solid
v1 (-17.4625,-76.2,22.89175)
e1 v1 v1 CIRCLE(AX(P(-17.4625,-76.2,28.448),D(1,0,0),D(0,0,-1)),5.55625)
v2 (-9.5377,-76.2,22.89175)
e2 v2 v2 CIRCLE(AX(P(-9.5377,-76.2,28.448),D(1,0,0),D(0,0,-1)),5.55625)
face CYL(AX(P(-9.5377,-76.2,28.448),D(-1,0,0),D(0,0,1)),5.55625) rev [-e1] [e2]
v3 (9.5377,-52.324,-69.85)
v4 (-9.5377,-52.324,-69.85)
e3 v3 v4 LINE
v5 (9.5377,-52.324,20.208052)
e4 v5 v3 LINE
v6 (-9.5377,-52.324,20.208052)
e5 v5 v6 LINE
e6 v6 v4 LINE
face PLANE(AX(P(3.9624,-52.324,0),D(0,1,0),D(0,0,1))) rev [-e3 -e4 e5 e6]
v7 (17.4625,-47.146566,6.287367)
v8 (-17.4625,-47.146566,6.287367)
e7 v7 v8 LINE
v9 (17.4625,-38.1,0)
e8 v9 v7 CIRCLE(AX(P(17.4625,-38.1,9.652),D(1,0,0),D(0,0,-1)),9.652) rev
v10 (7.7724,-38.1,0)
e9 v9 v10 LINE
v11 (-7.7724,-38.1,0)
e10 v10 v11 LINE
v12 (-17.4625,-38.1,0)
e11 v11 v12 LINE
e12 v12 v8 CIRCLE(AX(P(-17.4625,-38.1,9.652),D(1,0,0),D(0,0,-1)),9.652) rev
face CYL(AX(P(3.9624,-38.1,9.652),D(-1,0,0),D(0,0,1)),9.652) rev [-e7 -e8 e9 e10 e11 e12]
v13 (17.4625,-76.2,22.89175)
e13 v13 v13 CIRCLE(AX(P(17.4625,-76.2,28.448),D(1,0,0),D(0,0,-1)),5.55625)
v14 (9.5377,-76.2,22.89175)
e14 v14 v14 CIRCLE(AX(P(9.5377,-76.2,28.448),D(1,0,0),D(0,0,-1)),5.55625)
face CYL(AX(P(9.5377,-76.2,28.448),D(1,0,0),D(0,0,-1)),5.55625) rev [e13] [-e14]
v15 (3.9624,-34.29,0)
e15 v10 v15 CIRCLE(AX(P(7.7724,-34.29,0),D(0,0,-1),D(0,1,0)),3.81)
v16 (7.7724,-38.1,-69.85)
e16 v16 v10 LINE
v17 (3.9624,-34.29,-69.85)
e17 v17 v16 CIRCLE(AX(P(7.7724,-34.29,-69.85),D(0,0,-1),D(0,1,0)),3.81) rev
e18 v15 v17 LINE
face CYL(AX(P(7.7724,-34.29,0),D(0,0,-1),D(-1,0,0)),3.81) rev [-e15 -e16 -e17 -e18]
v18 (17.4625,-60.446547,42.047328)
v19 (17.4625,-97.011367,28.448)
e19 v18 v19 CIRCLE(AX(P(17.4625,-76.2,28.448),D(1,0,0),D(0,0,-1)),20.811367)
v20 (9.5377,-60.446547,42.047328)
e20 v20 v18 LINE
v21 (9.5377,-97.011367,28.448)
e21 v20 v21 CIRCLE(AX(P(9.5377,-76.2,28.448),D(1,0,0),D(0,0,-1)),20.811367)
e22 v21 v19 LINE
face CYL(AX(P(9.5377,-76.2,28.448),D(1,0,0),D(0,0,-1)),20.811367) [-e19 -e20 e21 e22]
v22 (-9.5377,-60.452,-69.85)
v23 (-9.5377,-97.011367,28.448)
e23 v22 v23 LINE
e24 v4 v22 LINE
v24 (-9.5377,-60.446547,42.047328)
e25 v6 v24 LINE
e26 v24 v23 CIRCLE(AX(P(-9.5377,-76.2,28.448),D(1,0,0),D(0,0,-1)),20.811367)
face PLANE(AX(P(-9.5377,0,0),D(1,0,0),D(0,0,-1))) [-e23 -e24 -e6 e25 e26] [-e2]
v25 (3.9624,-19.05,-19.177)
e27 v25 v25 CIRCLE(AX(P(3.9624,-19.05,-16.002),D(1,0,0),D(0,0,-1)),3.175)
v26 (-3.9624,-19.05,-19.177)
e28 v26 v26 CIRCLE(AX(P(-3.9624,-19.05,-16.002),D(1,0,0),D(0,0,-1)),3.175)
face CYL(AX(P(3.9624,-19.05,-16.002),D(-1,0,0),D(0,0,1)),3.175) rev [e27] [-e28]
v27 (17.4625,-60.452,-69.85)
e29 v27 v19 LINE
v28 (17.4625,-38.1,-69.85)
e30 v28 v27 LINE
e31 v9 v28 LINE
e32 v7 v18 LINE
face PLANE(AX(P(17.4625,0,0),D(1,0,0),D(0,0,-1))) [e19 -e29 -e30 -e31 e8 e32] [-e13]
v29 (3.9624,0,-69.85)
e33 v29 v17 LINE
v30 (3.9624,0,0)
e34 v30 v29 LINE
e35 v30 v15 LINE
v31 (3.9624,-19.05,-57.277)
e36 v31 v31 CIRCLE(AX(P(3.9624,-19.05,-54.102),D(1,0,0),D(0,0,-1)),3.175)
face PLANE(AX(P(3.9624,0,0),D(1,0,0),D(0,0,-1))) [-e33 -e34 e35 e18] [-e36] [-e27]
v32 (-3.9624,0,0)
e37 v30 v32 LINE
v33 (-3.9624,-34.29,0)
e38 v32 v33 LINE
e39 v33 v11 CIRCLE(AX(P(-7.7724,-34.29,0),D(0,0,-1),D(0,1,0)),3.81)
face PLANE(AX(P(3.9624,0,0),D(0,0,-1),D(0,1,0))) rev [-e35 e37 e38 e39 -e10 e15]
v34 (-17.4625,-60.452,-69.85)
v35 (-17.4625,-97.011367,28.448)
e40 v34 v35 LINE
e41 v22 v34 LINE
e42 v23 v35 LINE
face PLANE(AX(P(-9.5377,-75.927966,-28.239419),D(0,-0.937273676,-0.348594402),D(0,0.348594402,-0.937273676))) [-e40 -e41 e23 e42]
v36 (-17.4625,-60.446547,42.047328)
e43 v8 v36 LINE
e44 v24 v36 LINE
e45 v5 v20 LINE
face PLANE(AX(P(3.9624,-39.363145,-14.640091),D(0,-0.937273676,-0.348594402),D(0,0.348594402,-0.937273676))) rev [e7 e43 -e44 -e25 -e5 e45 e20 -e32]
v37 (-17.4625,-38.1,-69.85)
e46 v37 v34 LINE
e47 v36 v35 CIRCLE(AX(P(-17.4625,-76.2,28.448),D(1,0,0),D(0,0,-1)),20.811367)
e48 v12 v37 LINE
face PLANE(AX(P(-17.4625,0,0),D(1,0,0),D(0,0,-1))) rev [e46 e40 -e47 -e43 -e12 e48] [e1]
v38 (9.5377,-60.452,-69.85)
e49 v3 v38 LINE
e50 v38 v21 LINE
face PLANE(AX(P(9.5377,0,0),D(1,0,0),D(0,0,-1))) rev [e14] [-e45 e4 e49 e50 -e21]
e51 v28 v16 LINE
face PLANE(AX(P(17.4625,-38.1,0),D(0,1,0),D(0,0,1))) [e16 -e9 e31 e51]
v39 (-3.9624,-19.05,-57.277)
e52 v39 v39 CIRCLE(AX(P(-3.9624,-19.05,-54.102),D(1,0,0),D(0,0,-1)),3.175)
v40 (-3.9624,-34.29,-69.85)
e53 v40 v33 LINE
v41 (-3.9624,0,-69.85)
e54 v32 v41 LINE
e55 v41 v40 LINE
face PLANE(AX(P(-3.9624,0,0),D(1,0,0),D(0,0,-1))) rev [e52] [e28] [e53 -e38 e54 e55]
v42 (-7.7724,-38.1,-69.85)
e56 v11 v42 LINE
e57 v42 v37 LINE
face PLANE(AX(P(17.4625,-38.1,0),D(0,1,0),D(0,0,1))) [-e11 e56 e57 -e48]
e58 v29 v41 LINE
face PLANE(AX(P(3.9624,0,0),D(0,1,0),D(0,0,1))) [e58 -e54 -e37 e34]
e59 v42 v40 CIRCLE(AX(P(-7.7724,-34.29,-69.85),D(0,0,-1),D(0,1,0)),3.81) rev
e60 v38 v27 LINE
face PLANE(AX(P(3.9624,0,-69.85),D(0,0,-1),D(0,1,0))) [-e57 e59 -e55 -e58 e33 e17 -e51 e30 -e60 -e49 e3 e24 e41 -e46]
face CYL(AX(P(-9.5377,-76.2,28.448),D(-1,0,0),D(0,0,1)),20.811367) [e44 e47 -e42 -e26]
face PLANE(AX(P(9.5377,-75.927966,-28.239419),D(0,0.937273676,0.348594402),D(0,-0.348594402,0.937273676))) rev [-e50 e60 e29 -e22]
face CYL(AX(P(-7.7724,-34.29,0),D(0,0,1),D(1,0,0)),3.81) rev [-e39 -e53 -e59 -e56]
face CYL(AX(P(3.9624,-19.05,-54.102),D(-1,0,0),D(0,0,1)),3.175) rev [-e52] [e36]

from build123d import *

# Parameters (mm, degrees)
SKETCH1_W           = 69.85
SKETCH1_H           = 38.1
SKETCH1_R           = 3.175
BOSS_EXTRUDE1_DEPTH = 3.9624
BOSS_EXTRUDE2_DEPTH = 17.4625
BOSS_EXTRUDE4_START = 9.5377
SKETCH1_5_R         = 5.55625
BOSS_EXTRUDE4_DEPTH = 7.9248
BOSS_EXTRUDE5_START = -17.4625
SKETCH1_6_R         = 5.55625
BOSS_EXTRUDE5_DEPTH = 7.9248
FILLET1_R           = 3.81


with BuildPart() as part:
    # Sketch1 → Boss-Extrude1 (new, symmetric)
    # profile 1 of 2: a face of its own
    with BuildSketch(Plane(origin=(0, 0, 0), x_dir=(0, 0, -1), z_dir=(1, 0, 0))):
        with Locations((34.925, -19.05)):
            Rectangle(SKETCH1_W, SKETCH1_H)
        with Locations((16.002, -19.05)):
            Circle(SKETCH1_R, mode=Mode.SUBTRACT)
        with Locations((54.102, -19.05)):
            Circle(SKETCH1_R, mode=Mode.SUBTRACT)
    # profile 2 of 2: a face of its own
    with BuildSketch(Plane(origin=(0, 0, 0), x_dir=(0, 0, -1), z_dir=(1, 0, 0))):
        with BuildLine():
            Line((69.85, -38.1), (0, -38.1))
            ThreePointArc((0, -38.1), (-1.726202144, -43.608432839), (-6.287366834, -47.146565517))
            Line((-6.287366834, -47.146565517), (-20.208052372, -52.324))
            Line((-20.208052372, -52.324), (69.85, -52.324))
            Line((69.85, -52.324), (69.85, -38.1))
        make_face()
    extrude(amount=BOSS_EXTRUDE1_DEPTH, both=True)

    # Sketch1<3> → Boss-Extrude2 (add, symmetric)
    with BuildSketch(Plane(origin=(0, 0, 0), x_dir=(0, 0, -1), z_dir=(1, 0, 0))):
        with BuildLine():
            Line((69.85, -38.1), (0, -38.1))
            ThreePointArc((0, -38.1), (-1.726202144, -43.608432839), (-6.287366834, -47.146565517))
            Line((-6.287366834, -47.146565517), (-20.208052372, -52.324))
            Line((-20.208052372, -52.324), (69.85, -52.324))
            Line((69.85, -52.324), (69.85, -38.1))
        make_face()
    extrude(amount=BOSS_EXTRUDE2_DEPTH, both=True)

    # Sketch1<5> → Boss-Extrude4 (add)
    with BuildSketch(Plane(origin=(0, 0, 0), x_dir=(0, 0, -1), z_dir=(1, 0, 0)).offset(BOSS_EXTRUDE4_START)):
        with BuildLine():
            Line((69.85, -60.452), (69.85, -52.324))
            Line((69.85, -52.324), (-20.208052372, -52.324))
            Line((-20.208052372, -52.324), (-28.448, -55.388632763))
            Line((-28.448, -55.388632763), (-42.047327619, -60.446546582))
            ThreePointArc((-42.047327619, -60.446546582), (-47.953946665, -83.454726113), (-28.448, -97.011367237))
            Line((-28.448, -97.011367237), (69.85, -60.452))
        make_face()
        with Locations((-28.448, -76.2)):
            Circle(SKETCH1_5_R, mode=Mode.SUBTRACT)
    extrude(amount=BOSS_EXTRUDE4_DEPTH)

    # Sketch1<6> → Boss-Extrude5 (add)
    with BuildSketch(Plane(origin=(0, 0, 0), x_dir=(0, 0, -1), z_dir=(1, 0, 0)).offset(BOSS_EXTRUDE5_START)):
        with BuildLine():
            Line((69.85, -60.452), (69.85, -52.324))
            Line((69.85, -52.324), (-20.208052372, -52.324))
            Line((-20.208052372, -52.324), (-28.448, -55.388632763))
            Line((-28.448, -55.388632763), (-42.047327619, -60.446546582))
            ThreePointArc((-42.047327619, -60.446546582), (-47.953946665, -83.454726113), (-28.448, -97.011367237))
            Line((-28.448, -97.011367237), (69.85, -60.452))
        make_face()
        with Locations((-28.448, -76.2)):
            Circle(SKETCH1_6_R, mode=Mode.SUBTRACT)
    extrude(amount=BOSS_EXTRUDE5_DEPTH)

    # Fillet1
    # the kernel refuses this fillet: 3.81 mm, written as the material it adds along each edge
    with BuildSketch(Plane(origin=(-3.9624, -38.1, -69.85), x_dir=(-1, 0, 0), z_dir=(0, 0, 1))) as fillet1_piece_1:
        with BuildLine():
            CenterArc((FILLET1_R, -FILLET1_R), FILLET1_R, 90, 90)
            Line((0, -FILLET1_R), (0, 0))
            Line((0, 0), (FILLET1_R, 0))
        make_face()
    extrude(amount=69.85)
    with BuildSketch(Plane(origin=(3.9624, -38.1, -69.85), x_dir=(1, 0, 0), z_dir=(0, 0, 1))) as fillet1_piece_2:
        with BuildLine():
            CenterArc((FILLET1_R, FILLET1_R), FILLET1_R, 180, 90)
            Line((0, FILLET1_R), (0, 0))
            Line((0, 0), (FILLET1_R, 0))
        make_face()
    extrude(amount=69.85)


solid = part.part
